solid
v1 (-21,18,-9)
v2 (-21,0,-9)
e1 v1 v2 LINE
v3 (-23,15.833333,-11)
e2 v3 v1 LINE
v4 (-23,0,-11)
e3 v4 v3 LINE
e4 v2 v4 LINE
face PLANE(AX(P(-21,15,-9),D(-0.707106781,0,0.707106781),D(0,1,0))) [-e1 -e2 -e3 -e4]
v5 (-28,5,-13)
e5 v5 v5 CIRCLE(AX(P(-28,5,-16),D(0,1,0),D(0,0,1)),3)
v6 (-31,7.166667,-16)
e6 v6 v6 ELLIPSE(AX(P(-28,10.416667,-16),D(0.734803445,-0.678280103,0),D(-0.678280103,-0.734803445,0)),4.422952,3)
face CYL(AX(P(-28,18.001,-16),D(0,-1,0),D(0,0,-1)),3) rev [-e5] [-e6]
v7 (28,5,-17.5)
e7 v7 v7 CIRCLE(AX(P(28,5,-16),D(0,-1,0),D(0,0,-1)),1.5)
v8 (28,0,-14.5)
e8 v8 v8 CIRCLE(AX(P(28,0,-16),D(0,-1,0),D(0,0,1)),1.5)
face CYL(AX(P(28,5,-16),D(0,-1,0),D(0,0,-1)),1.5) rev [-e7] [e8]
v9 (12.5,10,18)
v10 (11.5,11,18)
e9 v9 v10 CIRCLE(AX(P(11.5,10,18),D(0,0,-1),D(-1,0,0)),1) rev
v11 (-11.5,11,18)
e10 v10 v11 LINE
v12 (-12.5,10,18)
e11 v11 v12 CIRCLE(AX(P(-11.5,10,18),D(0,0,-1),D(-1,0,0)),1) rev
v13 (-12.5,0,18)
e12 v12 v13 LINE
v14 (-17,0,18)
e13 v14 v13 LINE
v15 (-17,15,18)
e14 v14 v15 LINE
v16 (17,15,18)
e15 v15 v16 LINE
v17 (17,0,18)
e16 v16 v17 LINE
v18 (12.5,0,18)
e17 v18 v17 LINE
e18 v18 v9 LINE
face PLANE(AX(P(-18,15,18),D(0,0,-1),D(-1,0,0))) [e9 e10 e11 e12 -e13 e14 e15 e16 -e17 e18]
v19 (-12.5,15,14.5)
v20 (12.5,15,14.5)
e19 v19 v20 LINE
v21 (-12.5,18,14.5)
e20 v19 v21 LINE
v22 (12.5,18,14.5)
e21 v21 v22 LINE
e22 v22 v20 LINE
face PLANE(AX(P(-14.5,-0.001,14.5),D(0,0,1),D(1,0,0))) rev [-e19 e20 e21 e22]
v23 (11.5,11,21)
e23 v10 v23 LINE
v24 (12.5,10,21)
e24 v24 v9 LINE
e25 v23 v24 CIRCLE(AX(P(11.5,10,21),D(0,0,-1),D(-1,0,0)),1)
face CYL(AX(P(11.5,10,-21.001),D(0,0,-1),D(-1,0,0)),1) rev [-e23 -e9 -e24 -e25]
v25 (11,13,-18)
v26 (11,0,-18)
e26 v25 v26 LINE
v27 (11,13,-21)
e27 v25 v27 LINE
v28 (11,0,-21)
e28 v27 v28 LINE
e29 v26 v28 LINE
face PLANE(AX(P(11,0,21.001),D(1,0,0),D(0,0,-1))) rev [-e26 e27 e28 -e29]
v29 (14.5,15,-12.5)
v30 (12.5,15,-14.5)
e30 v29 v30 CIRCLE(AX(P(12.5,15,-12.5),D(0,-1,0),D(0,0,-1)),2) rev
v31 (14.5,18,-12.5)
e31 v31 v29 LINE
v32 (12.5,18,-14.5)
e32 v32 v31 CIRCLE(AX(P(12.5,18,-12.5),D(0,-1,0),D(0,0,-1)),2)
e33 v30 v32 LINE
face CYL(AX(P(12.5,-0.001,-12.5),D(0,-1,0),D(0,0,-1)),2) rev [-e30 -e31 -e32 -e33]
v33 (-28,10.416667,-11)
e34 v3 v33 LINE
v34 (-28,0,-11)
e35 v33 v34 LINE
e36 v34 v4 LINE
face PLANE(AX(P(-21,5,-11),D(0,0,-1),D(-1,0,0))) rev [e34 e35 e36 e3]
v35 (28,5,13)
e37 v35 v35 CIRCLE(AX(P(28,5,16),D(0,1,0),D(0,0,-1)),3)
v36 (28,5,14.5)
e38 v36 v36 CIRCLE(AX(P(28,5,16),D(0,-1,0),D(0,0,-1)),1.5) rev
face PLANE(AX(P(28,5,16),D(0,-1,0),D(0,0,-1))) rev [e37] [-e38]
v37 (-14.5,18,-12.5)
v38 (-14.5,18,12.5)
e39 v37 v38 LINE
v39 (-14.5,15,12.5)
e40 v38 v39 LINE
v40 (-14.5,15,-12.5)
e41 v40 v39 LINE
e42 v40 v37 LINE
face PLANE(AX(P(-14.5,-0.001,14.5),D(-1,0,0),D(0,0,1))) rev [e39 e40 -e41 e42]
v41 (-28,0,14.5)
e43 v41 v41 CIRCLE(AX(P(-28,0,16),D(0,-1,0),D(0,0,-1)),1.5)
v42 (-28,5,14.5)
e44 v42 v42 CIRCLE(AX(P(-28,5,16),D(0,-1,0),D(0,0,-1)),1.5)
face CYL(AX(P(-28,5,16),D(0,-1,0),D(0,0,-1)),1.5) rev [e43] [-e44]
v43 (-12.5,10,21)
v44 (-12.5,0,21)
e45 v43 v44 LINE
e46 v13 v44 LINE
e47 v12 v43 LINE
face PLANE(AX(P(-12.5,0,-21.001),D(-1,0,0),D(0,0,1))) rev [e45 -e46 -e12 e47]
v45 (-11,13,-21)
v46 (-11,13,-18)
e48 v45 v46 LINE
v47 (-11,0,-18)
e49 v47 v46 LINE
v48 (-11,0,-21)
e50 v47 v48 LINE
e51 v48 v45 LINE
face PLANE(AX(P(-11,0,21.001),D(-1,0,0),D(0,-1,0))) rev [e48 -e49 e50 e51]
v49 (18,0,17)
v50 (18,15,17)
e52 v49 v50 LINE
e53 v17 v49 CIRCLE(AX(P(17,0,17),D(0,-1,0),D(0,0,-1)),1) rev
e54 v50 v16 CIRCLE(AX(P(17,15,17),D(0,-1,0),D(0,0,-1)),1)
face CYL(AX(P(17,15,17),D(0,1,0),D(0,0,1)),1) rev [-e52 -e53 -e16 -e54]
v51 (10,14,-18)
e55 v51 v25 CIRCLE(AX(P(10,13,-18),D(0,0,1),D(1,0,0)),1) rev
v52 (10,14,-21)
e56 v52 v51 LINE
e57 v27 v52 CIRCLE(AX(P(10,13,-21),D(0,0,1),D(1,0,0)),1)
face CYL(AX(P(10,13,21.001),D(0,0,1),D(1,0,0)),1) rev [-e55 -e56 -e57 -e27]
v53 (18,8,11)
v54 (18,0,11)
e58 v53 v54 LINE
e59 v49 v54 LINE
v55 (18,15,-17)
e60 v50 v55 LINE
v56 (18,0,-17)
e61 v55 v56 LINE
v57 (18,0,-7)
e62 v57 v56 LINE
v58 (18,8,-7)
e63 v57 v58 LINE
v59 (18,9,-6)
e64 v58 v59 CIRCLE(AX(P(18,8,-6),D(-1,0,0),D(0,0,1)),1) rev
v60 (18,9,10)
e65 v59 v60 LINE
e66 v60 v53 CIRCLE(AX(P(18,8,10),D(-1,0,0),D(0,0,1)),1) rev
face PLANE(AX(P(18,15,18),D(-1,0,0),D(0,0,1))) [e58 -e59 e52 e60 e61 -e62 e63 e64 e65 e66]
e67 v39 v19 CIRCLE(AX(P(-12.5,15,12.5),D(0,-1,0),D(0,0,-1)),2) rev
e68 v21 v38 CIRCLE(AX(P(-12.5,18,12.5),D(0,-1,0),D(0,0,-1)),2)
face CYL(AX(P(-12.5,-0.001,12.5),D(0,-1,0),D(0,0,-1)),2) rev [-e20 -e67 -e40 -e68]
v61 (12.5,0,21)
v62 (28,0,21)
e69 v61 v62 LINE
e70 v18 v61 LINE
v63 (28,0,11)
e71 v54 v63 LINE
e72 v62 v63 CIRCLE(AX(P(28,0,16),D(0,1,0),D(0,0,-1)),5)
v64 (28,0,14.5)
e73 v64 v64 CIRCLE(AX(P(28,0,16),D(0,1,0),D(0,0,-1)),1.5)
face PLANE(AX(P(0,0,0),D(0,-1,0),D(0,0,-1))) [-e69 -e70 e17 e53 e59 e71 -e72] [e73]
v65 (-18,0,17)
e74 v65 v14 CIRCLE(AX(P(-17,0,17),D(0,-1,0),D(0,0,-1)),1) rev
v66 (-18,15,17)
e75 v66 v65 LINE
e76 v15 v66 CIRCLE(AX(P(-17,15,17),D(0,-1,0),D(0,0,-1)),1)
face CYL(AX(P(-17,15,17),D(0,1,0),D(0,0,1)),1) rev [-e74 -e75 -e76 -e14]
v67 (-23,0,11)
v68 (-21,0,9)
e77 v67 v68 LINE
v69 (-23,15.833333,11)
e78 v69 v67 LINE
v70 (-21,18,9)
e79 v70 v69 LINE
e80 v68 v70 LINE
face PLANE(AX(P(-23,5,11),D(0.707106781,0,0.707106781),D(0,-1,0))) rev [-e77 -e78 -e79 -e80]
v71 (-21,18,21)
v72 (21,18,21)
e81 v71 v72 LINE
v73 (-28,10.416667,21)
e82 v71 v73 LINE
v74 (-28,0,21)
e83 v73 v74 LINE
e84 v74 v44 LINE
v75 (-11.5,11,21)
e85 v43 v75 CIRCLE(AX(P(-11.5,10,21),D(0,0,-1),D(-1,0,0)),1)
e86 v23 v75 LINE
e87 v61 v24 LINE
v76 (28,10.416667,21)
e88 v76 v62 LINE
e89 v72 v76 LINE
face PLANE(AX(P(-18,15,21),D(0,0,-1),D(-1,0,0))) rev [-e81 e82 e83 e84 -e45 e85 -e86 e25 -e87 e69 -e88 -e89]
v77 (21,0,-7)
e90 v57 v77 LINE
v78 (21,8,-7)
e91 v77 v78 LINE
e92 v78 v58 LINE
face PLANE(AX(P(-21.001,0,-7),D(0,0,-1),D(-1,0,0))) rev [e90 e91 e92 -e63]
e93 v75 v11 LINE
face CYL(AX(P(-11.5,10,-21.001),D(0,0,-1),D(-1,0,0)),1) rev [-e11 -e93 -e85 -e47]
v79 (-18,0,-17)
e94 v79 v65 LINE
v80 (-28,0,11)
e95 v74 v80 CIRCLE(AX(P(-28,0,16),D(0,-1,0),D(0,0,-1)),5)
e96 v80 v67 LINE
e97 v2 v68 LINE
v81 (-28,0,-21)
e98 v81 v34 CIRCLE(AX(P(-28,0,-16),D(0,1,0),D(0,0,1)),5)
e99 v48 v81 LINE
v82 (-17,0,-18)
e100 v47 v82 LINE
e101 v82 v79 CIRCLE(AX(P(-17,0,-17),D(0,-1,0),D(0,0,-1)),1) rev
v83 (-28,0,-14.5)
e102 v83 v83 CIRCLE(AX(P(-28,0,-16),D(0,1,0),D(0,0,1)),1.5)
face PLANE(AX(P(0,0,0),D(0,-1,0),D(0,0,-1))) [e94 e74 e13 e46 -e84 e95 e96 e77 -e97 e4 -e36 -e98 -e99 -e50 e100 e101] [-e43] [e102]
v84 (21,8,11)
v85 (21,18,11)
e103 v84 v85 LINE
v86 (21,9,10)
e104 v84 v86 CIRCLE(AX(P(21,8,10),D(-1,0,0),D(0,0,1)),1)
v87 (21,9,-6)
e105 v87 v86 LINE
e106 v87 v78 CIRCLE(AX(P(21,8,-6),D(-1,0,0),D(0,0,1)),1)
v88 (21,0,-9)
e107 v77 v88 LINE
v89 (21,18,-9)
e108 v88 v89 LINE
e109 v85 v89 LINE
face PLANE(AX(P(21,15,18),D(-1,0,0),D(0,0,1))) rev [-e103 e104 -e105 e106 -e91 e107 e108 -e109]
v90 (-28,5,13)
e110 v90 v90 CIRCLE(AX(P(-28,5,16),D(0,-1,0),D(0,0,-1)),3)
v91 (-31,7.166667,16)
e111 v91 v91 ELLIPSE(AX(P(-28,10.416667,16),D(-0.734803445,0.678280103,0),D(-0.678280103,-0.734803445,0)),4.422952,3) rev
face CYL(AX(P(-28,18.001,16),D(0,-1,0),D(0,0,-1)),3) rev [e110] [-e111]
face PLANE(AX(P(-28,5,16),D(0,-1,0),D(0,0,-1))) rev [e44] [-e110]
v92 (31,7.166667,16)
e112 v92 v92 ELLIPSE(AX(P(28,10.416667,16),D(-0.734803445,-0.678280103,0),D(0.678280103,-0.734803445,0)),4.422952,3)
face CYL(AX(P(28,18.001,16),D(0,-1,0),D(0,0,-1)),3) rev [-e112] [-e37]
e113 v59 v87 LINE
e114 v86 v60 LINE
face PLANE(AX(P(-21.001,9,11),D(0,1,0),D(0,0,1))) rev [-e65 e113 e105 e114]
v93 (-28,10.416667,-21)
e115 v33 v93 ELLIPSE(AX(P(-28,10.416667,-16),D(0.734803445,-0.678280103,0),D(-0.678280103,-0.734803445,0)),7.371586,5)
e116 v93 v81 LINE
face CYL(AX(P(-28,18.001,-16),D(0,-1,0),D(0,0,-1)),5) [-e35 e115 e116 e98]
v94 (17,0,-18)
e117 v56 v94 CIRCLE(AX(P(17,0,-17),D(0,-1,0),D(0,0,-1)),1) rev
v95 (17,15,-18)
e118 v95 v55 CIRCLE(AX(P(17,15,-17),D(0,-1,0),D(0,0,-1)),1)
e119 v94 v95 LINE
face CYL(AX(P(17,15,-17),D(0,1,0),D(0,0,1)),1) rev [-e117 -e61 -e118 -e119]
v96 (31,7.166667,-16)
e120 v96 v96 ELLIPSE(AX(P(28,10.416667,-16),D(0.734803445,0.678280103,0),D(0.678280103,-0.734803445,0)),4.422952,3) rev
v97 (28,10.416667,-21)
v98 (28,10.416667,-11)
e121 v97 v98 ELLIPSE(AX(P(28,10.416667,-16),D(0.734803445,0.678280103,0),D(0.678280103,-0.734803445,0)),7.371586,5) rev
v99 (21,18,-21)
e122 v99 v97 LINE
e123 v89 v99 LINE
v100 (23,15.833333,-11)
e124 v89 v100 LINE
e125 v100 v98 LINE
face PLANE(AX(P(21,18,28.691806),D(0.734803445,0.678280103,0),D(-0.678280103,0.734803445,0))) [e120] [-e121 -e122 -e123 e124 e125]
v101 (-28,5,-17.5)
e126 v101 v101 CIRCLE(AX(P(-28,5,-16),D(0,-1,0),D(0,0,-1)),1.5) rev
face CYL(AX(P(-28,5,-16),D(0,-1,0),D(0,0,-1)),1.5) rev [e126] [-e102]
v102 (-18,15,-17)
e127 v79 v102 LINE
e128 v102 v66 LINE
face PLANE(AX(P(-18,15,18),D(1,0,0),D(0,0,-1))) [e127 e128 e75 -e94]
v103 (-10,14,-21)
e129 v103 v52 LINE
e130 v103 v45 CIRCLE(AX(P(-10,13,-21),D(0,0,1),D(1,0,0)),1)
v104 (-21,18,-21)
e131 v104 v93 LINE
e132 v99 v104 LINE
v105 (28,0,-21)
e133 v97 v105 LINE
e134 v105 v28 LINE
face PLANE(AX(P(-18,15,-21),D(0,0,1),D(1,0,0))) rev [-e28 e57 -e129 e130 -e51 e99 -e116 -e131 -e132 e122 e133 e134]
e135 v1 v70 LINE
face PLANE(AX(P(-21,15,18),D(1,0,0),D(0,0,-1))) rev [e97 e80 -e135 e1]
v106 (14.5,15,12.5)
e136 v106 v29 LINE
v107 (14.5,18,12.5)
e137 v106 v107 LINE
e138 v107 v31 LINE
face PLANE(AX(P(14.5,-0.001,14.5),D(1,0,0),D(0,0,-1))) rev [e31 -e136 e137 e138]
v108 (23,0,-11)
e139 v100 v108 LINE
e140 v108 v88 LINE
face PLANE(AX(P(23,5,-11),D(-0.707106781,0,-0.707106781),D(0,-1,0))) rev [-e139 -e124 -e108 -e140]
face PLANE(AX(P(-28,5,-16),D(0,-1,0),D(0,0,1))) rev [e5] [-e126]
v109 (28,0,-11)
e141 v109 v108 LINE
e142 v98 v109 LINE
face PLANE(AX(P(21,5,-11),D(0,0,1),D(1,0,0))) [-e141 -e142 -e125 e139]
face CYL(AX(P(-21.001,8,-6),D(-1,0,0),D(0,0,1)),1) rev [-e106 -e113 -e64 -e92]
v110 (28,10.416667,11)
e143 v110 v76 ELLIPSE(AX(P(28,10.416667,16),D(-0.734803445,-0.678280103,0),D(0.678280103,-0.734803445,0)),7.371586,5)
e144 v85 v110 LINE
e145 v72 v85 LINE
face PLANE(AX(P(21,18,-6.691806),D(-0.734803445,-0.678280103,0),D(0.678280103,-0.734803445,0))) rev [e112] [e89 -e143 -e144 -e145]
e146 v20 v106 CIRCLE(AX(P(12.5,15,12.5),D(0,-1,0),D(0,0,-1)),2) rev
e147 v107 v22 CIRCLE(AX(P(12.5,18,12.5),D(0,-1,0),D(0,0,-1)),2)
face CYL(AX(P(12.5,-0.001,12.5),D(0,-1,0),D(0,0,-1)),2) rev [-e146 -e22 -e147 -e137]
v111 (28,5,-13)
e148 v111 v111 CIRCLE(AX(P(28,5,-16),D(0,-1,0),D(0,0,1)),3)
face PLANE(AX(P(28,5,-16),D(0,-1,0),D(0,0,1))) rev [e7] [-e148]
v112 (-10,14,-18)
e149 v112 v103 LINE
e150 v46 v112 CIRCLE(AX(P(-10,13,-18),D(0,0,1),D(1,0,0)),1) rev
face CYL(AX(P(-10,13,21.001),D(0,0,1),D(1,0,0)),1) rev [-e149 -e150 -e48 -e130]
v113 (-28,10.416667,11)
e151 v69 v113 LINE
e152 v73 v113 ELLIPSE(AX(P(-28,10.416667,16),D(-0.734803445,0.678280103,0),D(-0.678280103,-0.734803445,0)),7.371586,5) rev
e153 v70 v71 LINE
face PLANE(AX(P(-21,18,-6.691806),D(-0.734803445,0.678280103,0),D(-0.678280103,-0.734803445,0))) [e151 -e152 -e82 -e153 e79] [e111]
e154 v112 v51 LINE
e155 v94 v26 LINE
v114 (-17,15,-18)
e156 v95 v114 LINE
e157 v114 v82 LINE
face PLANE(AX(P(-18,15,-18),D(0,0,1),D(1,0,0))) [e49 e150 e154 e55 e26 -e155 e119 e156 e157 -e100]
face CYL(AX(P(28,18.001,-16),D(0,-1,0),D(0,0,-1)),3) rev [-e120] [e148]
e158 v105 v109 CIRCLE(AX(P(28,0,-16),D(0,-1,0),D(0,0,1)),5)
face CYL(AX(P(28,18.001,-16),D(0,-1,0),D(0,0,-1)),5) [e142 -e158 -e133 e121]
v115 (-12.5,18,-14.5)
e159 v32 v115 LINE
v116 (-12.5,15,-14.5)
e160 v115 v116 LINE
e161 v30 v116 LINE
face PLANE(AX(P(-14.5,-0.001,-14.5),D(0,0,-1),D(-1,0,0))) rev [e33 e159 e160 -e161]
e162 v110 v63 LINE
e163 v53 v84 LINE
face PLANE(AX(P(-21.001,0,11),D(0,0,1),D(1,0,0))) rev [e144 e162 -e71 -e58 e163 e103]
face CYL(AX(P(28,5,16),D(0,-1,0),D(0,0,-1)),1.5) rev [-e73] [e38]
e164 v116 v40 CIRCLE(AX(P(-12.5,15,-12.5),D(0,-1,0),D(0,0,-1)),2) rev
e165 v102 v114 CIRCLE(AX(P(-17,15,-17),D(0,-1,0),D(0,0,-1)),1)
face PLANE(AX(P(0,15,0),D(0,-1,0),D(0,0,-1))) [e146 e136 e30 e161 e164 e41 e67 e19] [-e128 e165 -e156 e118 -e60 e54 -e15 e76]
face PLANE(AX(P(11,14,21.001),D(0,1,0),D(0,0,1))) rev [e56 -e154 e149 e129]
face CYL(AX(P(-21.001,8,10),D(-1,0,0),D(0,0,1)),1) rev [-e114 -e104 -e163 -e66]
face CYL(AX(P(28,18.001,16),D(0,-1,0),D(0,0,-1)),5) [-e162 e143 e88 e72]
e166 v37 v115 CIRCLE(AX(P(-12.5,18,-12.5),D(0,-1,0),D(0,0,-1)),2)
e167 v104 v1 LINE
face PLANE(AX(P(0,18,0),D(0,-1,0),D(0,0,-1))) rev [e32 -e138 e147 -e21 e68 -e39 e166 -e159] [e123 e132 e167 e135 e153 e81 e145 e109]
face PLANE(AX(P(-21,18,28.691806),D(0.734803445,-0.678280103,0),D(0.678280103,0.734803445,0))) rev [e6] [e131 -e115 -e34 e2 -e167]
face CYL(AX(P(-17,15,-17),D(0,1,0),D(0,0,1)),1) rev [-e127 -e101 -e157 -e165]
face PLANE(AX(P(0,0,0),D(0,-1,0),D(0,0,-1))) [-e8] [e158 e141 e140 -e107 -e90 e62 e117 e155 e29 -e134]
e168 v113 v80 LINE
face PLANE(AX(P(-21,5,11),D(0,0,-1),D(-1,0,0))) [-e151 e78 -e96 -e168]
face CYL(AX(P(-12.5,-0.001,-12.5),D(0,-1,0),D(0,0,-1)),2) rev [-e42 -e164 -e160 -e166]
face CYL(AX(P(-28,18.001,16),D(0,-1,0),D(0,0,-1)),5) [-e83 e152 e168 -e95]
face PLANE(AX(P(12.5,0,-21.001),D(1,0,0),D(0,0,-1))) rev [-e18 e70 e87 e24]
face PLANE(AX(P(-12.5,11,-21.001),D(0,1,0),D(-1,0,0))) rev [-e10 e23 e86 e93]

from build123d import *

# Parameters (mm, degrees)
SKETCH1_W             = 36
SKETCH1_H             = 36
BOSS_EXTRUDE1_DEPTH   = 15
SHELL1_T              = 3
CUT_EXTRUDE1_REACH    = 52.289
SKETCH2_W             = 25
SKETCH2_H             = 11
CUT_EXTRUDE2_REACH    = 52.289
SKETCH3_W             = 18
SKETCH3_H             = 9
CUT_EXTRUDE3_REACH    = 36.728
SKETCH5_W             = 29
SKETCH5_H             = 29
FILLET1_R             = 2
CUT_EXTRUDE4_REACH    = 52.289
SKETCH6_W             = 22
SKETCH6_H             = 14
FILLET2_R             = 1
SKETCH9_W             = 12
SKETCH9_H             = 10
BOSS_EXTRUDE3_DEPTH   = 5
BOSS_EXTRUDE4_DEPTH   = 10
SKETCH11_R            = 1.5
CUT_EXTRUDE5_DEPTH    = 5
CUT_EXTRUDE6_REACH    = 43.219
SKETCH12_R            = 3
CUT_EXTRUDE7_REACH    = 45.058
MIRROR3_OUTLINE_R     = 1.5
MIRROR3_DEPTH         = 5
MIRROR3_START         = 5
MIRROR3_2_OUTLINE_R   = 3
MIRROR3_2_DEPTH       = 13
MIRROR3_START_2       = 27.639914186
MIRROR3_3_OUTLINE_W   = 20
MIRROR3_3_OUTLINE_H   = 12
MIRROR3_3_OUTLINE_H_2 = 11
MIRROR3_3_DEPTH       = 9.360085814
CHAMFER1_SIZE         = 2
FILLET3_R             = 1


with BuildPart() as part:
    # Sketch1 → Boss-Extrude1 (new body)
    with BuildSketch(Plane(origin=(0, 0, 0), x_dir=(1, 0, 0), z_dir=(0, 1, 0))):
        Rectangle(SKETCH1_W, SKETCH1_H)
    extrude(amount=BOSS_EXTRUDE1_DEPTH)

    # Shell1
    shell1_openings = [part.faces().sort_by_distance(p)[0] for p in [
        (0, 0, 0),
    ]]
    offset(amount=SHELL1_T, openings=shell1_openings, kind=Kind.INTERSECTION)

    # Sketch2 → Cut-Extrude1 (cut, up to next)
    with BuildSketch(Plane.XY.offset(21), mode=Mode.PRIVATE) as cut_extrude1_sk1:
        with Locations((0, 5.5)):
            Rectangle(SKETCH2_W, SKETCH2_H)
    cut_extrude1_tool1 = extrude(cut_extrude1_sk1.sketch, amount=-CUT_EXTRUDE1_REACH, mode=Mode.PRIVATE) & part.part
    add(cut_extrude1_tool1.solids().sort_by_distance((0, 5.5, 21))[0], mode=Mode.SUBTRACT)

    # Sketch3 → Cut-Extrude2 (cut, up to next)
    with BuildSketch(Plane(origin=(21, 0, 0), x_dir=(0, 0, -1), z_dir=(1, 0, 0)), mode=Mode.PRIVATE) as cut_extrude2_sk1:
        with Locations((-2, 4.5)):
            Rectangle(SKETCH3_W, SKETCH3_H)
    cut_extrude2_tool1 = extrude(cut_extrude2_sk1.sketch, amount=-CUT_EXTRUDE2_REACH, mode=Mode.PRIVATE) & part.part
    add(cut_extrude2_tool1.solids().sort_by_distance((21, 4.5, 2))[0], mode=Mode.SUBTRACT)

    # Sketch5 → Cut-Extrude3 (cut, up to next)
    with BuildSketch(Plane(origin=(0, 18, 0), x_dir=(1, 0, 0), z_dir=(0, 1, 0)), mode=Mode.PRIVATE) as cut_extrude3_sk1:
        Rectangle(SKETCH5_W, SKETCH5_H)
    cut_extrude3_tool1 = extrude(cut_extrude3_sk1.sketch, amount=-CUT_EXTRUDE3_REACH, mode=Mode.PRIVATE) & part.part
    add(cut_extrude3_tool1.solids().sort_by_distance((0, 18, 0))[0], mode=Mode.SUBTRACT)

    # Fillet1
    fillet1_edges = [part.edges().sort_by_distance(p)[0] for p in [
        (14.5, 16.5, -14.5),
        (14.5, 16.5, 14.5),
        (-14.5, 16.5, 14.5),
        (-14.5, 16.5, -14.5),
    ]]
    fillet(fillet1_edges, radius=FILLET1_R)

    # Sketch6 → Cut-Extrude4 (cut, up to next)
    with BuildSketch(Plane(origin=(0, 0, -21), x_dir=(-1, 0, 0), z_dir=(0, 0, -1)), mode=Mode.PRIVATE) as cut_extrude4_sk1:
        with Locations((0, 7)):
            Rectangle(SKETCH6_W, SKETCH6_H)
    cut_extrude4_tool1 = extrude(cut_extrude4_sk1.sketch, amount=-CUT_EXTRUDE4_REACH, mode=Mode.PRIVATE) & part.part
    add(cut_extrude4_tool1.solids().sort_by_distance((0, 7, -21))[0], mode=Mode.SUBTRACT)

    # Fillet2
    fillet2_edges = [part.edges().sort_by_distance(p)[0] for p in [
        (-11, 14, -19.5),
        (11, 14, -19.5),
        (12.5, 11, 19.5),
        (-12.5, 11, 19.5),
        (19.5, 9, 11),
        (19.5, 9, -7),
    ]]
    fillet(fillet2_edges, radius=FILLET2_R)

    # Sketch9 → Boss-Extrude3 (add)
    with BuildSketch(Plane.XZ):
        with Locations((-27, 16)):
            Rectangle(SKETCH9_W, SKETCH9_H)
    boss_extrude3 = extrude(amount=-BOSS_EXTRUDE3_DEPTH)

    # Sketch10 → Boss-Extrude4 (add)
    with BuildSketch(Plane.XY.offset(21)):
        Polygon((-21, 18), (-33, 5), (-21, 5), align=None)
    boss_extrude4 = extrude(amount=-BOSS_EXTRUDE4_DEPTH)

    # Sketch11 → Cut-Extrude5 (cut)
    with BuildSketch(Plane.XZ):
        with Locations(Location((-28, 16, 0), (0, 0, 270))):
            Circle(SKETCH11_R)
    cut_extrude5 = extrude(amount=-CUT_EXTRUDE5_DEPTH, mode=Mode.SUBTRACT)

    # Cut-Extrude6: up to this plane
    cut_extrude6_end = Plane(origin=(-21, 18, -6.691806013), z_dir=(-0.7348034446274878, 0.678280102733066, 0))
    # Sketch12 → Cut-Extrude6 (cut, up to the surface)
    with BuildSketch(Plane.XZ.offset(-5), mode=Mode.PRIVATE) as cut_extrude6_sk1:
        with Locations(Location((-28, 16, 0), (0, 0, 270))):
            Circle(SKETCH12_R)
    cut_extrude6_tool1 = split(extrude(cut_extrude6_sk1.sketch, amount=-CUT_EXTRUDE6_REACH, mode=Mode.PRIVATE), bisect_by=cut_extrude6_end, keep=Keep.BOTH, mode=Mode.PRIVATE)
    cut_extrude6 = cut_extrude6_tool1.solids().sort_by_distance((-28, 5, 16))[0]
    add(cut_extrude6, mode=Mode.SUBTRACT)

    # Cut-Extrude7: up to this plane
    cut_extrude7_end = Plane(origin=(-21, 18, -6.691806013), z_dir=(-0.7348034446274878, 0.678280102733066, 0))
    # Sketch13 → Cut-Extrude7 (cut, up to the surface)
    with BuildSketch(Plane.XZ, mode=Mode.PRIVATE) as cut_extrude7_sk1:
        with BuildLine():
            ThreePointArc((-33, 16), (-31.535533906, 19.535533906), (-28, 21))
            Line((-28, 21), (-33, 21))
            Line((-33, 21), (-33, 16))
        make_face()
    cut_extrude7_tool1 = split(extrude(cut_extrude7_sk1.sketch, amount=-CUT_EXTRUDE7_REACH, mode=Mode.PRIVATE), bisect_by=cut_extrude7_end, keep=Keep.BOTH, mode=Mode.PRIVATE)
    # Sketch13 → Cut-Extrude7 (cut, up to the surface)
    with BuildSketch(Plane.XZ, mode=Mode.PRIVATE) as cut_extrude7_sk2:
        with BuildLine():
            Line((-33, 11), (-28, 11))
            ThreePointArc((-28, 11), (-31.535533906, 12.464466094), (-33, 16))
            Line((-33, 16), (-33, 11))
        make_face()
    cut_extrude7_tool2 = split(extrude(cut_extrude7_sk2.sketch, amount=-CUT_EXTRUDE7_REACH, mode=Mode.PRIVATE), bisect_by=cut_extrude7_end, keep=Keep.BOTH, mode=Mode.PRIVATE)
    cut_extrude7 = cut_extrude7_tool1.solids().sort_by_distance((-31.88316, 0, 19.88316))[0] + cut_extrude7_tool2.solids().sort_by_distance((-31.88316, 0, 12.11684))[0]
    add(cut_extrude7, mode=Mode.SUBTRACT)

    # Mirror1: Boss-Extrude3, Boss-Extrude4, Cut-Extrude5, Cut-Extrude6, Cut-Extrude7 across plane
    add(boss_extrude3.mirror(Plane.XY))
    add(boss_extrude4.mirror(Plane.XY))
    add(cut_extrude5.mirror(Plane.XY), mode=Mode.SUBTRACT)
    add(cut_extrude6.mirror(Plane.XY), mode=Mode.SUBTRACT)
    add(cut_extrude7.mirror(Plane.XY), mode=Mode.SUBTRACT)

    # Mirror3: read off the stored shape, not the designer's step
    # Mirror3 outline → Mirror3 (add)
    # profile 1 of 2: a face of its own
    with BuildSketch(Plane(origin=(0, 0, 0), x_dir=(1, 0, 0), z_dir=(0, 1, 0))):
        with BuildLine():
            Line((21, 21), (21, 11))
            Line((21, 11), (28, 11))
            ThreePointArc((28, 11), (33, 16), (28, 21))
            Line((28, 21), (21, 21))
        make_face()
        with Locations((28, 16)):
            Circle(MIRROR3_OUTLINE_R, mode=Mode.SUBTRACT)
    # profile 2 of 2: a face of its own
    with BuildSketch(Plane(origin=(0, 0, 0), x_dir=(1, 0, 0), z_dir=(0, 1, 0))):
        with BuildLine():
            Line((28, -11), (21, -11))
            Line((21, -11), (21, -21))
            Line((21, -21), (28, -21))
            ThreePointArc((28, -21), (33, -16), (28, -11))
        make_face()
        with Locations((28, -16)):
            Circle(MIRROR3_OUTLINE_R, mode=Mode.SUBTRACT)
    extrude(amount=MIRROR3_DEPTH)

    # Mirror3 2 outline → Mirror3 2 (add)
    # profile 1 of 2: a face of its own
    with BuildSketch(Plane(origin=(0, 0, 0), x_dir=(1, 0, 0), z_dir=(0, 1, 0)).offset(MIRROR3_START)):
        with BuildLine():
            Line((21, 21), (21, 11))
            Line((21, 11), (28, 11))
            ThreePointArc((28, 11), (33, 16), (28, 21))
            Line((28, 21), (21, 21))
        make_face()
        with Locations((28, 16)):
            Circle(MIRROR3_2_OUTLINE_R, mode=Mode.SUBTRACT)
    # profile 2 of 2: a face of its own
    with BuildSketch(Plane(origin=(0, 0, 0), x_dir=(1, 0, 0), z_dir=(0, 1, 0)).offset(MIRROR3_START)):
        with BuildLine():
            Line((28, -11), (21, -11))
            Line((21, -11), (21, -21))
            Line((21, -21), (28, -21))
            ThreePointArc((28, -21), (33, -16), (28, -11))
        make_face()
        with Locations((28, -16)):
            Circle(MIRROR3_2_OUTLINE_R, mode=Mode.SUBTRACT)
    extrude(amount=MIRROR3_2_DEPTH)

    # Mirror3 3 outline → Mirror3 3 (cut)
    with BuildSketch(Plane(origin=(0, 0, 0), x_dir=(0.6782801027330657, -0.734803444627488, 0), z_dir=(0.7348034446274879, 0.6782801027330659, 0)).offset(MIRROR3_START_2)):
        with Locations((10, 17)):
            Rectangle(MIRROR3_3_OUTLINE_W, MIRROR3_3_OUTLINE_H)
        with Locations((10, -16.5)):
            Rectangle(MIRROR3_3_OUTLINE_W, MIRROR3_3_OUTLINE_H_2)
    extrude(amount=MIRROR3_3_DEPTH, mode=Mode.SUBTRACT)

    # Chamfer1
    chamfer1_edges = [part.edges().sort_by_distance(p)[0] for p in [
        (-21, 9, 11),
        (-21, 9, -11),
        (21, 9, -11),
    ]]
    chamfer(chamfer1_edges, length=CHAMFER1_SIZE)

    # Fillet3
    fillet3_edges = [part.edges().sort_by_distance(p)[0] for p in [
        (18, 7.5, 18),
        (18, 7.5, -18),
        (-18, 7.5, -18),
        (-18, 7.5, 18),
    ]]
    fillet(fillet3_edges, radius=FILLET3_R)


solid = part.part
